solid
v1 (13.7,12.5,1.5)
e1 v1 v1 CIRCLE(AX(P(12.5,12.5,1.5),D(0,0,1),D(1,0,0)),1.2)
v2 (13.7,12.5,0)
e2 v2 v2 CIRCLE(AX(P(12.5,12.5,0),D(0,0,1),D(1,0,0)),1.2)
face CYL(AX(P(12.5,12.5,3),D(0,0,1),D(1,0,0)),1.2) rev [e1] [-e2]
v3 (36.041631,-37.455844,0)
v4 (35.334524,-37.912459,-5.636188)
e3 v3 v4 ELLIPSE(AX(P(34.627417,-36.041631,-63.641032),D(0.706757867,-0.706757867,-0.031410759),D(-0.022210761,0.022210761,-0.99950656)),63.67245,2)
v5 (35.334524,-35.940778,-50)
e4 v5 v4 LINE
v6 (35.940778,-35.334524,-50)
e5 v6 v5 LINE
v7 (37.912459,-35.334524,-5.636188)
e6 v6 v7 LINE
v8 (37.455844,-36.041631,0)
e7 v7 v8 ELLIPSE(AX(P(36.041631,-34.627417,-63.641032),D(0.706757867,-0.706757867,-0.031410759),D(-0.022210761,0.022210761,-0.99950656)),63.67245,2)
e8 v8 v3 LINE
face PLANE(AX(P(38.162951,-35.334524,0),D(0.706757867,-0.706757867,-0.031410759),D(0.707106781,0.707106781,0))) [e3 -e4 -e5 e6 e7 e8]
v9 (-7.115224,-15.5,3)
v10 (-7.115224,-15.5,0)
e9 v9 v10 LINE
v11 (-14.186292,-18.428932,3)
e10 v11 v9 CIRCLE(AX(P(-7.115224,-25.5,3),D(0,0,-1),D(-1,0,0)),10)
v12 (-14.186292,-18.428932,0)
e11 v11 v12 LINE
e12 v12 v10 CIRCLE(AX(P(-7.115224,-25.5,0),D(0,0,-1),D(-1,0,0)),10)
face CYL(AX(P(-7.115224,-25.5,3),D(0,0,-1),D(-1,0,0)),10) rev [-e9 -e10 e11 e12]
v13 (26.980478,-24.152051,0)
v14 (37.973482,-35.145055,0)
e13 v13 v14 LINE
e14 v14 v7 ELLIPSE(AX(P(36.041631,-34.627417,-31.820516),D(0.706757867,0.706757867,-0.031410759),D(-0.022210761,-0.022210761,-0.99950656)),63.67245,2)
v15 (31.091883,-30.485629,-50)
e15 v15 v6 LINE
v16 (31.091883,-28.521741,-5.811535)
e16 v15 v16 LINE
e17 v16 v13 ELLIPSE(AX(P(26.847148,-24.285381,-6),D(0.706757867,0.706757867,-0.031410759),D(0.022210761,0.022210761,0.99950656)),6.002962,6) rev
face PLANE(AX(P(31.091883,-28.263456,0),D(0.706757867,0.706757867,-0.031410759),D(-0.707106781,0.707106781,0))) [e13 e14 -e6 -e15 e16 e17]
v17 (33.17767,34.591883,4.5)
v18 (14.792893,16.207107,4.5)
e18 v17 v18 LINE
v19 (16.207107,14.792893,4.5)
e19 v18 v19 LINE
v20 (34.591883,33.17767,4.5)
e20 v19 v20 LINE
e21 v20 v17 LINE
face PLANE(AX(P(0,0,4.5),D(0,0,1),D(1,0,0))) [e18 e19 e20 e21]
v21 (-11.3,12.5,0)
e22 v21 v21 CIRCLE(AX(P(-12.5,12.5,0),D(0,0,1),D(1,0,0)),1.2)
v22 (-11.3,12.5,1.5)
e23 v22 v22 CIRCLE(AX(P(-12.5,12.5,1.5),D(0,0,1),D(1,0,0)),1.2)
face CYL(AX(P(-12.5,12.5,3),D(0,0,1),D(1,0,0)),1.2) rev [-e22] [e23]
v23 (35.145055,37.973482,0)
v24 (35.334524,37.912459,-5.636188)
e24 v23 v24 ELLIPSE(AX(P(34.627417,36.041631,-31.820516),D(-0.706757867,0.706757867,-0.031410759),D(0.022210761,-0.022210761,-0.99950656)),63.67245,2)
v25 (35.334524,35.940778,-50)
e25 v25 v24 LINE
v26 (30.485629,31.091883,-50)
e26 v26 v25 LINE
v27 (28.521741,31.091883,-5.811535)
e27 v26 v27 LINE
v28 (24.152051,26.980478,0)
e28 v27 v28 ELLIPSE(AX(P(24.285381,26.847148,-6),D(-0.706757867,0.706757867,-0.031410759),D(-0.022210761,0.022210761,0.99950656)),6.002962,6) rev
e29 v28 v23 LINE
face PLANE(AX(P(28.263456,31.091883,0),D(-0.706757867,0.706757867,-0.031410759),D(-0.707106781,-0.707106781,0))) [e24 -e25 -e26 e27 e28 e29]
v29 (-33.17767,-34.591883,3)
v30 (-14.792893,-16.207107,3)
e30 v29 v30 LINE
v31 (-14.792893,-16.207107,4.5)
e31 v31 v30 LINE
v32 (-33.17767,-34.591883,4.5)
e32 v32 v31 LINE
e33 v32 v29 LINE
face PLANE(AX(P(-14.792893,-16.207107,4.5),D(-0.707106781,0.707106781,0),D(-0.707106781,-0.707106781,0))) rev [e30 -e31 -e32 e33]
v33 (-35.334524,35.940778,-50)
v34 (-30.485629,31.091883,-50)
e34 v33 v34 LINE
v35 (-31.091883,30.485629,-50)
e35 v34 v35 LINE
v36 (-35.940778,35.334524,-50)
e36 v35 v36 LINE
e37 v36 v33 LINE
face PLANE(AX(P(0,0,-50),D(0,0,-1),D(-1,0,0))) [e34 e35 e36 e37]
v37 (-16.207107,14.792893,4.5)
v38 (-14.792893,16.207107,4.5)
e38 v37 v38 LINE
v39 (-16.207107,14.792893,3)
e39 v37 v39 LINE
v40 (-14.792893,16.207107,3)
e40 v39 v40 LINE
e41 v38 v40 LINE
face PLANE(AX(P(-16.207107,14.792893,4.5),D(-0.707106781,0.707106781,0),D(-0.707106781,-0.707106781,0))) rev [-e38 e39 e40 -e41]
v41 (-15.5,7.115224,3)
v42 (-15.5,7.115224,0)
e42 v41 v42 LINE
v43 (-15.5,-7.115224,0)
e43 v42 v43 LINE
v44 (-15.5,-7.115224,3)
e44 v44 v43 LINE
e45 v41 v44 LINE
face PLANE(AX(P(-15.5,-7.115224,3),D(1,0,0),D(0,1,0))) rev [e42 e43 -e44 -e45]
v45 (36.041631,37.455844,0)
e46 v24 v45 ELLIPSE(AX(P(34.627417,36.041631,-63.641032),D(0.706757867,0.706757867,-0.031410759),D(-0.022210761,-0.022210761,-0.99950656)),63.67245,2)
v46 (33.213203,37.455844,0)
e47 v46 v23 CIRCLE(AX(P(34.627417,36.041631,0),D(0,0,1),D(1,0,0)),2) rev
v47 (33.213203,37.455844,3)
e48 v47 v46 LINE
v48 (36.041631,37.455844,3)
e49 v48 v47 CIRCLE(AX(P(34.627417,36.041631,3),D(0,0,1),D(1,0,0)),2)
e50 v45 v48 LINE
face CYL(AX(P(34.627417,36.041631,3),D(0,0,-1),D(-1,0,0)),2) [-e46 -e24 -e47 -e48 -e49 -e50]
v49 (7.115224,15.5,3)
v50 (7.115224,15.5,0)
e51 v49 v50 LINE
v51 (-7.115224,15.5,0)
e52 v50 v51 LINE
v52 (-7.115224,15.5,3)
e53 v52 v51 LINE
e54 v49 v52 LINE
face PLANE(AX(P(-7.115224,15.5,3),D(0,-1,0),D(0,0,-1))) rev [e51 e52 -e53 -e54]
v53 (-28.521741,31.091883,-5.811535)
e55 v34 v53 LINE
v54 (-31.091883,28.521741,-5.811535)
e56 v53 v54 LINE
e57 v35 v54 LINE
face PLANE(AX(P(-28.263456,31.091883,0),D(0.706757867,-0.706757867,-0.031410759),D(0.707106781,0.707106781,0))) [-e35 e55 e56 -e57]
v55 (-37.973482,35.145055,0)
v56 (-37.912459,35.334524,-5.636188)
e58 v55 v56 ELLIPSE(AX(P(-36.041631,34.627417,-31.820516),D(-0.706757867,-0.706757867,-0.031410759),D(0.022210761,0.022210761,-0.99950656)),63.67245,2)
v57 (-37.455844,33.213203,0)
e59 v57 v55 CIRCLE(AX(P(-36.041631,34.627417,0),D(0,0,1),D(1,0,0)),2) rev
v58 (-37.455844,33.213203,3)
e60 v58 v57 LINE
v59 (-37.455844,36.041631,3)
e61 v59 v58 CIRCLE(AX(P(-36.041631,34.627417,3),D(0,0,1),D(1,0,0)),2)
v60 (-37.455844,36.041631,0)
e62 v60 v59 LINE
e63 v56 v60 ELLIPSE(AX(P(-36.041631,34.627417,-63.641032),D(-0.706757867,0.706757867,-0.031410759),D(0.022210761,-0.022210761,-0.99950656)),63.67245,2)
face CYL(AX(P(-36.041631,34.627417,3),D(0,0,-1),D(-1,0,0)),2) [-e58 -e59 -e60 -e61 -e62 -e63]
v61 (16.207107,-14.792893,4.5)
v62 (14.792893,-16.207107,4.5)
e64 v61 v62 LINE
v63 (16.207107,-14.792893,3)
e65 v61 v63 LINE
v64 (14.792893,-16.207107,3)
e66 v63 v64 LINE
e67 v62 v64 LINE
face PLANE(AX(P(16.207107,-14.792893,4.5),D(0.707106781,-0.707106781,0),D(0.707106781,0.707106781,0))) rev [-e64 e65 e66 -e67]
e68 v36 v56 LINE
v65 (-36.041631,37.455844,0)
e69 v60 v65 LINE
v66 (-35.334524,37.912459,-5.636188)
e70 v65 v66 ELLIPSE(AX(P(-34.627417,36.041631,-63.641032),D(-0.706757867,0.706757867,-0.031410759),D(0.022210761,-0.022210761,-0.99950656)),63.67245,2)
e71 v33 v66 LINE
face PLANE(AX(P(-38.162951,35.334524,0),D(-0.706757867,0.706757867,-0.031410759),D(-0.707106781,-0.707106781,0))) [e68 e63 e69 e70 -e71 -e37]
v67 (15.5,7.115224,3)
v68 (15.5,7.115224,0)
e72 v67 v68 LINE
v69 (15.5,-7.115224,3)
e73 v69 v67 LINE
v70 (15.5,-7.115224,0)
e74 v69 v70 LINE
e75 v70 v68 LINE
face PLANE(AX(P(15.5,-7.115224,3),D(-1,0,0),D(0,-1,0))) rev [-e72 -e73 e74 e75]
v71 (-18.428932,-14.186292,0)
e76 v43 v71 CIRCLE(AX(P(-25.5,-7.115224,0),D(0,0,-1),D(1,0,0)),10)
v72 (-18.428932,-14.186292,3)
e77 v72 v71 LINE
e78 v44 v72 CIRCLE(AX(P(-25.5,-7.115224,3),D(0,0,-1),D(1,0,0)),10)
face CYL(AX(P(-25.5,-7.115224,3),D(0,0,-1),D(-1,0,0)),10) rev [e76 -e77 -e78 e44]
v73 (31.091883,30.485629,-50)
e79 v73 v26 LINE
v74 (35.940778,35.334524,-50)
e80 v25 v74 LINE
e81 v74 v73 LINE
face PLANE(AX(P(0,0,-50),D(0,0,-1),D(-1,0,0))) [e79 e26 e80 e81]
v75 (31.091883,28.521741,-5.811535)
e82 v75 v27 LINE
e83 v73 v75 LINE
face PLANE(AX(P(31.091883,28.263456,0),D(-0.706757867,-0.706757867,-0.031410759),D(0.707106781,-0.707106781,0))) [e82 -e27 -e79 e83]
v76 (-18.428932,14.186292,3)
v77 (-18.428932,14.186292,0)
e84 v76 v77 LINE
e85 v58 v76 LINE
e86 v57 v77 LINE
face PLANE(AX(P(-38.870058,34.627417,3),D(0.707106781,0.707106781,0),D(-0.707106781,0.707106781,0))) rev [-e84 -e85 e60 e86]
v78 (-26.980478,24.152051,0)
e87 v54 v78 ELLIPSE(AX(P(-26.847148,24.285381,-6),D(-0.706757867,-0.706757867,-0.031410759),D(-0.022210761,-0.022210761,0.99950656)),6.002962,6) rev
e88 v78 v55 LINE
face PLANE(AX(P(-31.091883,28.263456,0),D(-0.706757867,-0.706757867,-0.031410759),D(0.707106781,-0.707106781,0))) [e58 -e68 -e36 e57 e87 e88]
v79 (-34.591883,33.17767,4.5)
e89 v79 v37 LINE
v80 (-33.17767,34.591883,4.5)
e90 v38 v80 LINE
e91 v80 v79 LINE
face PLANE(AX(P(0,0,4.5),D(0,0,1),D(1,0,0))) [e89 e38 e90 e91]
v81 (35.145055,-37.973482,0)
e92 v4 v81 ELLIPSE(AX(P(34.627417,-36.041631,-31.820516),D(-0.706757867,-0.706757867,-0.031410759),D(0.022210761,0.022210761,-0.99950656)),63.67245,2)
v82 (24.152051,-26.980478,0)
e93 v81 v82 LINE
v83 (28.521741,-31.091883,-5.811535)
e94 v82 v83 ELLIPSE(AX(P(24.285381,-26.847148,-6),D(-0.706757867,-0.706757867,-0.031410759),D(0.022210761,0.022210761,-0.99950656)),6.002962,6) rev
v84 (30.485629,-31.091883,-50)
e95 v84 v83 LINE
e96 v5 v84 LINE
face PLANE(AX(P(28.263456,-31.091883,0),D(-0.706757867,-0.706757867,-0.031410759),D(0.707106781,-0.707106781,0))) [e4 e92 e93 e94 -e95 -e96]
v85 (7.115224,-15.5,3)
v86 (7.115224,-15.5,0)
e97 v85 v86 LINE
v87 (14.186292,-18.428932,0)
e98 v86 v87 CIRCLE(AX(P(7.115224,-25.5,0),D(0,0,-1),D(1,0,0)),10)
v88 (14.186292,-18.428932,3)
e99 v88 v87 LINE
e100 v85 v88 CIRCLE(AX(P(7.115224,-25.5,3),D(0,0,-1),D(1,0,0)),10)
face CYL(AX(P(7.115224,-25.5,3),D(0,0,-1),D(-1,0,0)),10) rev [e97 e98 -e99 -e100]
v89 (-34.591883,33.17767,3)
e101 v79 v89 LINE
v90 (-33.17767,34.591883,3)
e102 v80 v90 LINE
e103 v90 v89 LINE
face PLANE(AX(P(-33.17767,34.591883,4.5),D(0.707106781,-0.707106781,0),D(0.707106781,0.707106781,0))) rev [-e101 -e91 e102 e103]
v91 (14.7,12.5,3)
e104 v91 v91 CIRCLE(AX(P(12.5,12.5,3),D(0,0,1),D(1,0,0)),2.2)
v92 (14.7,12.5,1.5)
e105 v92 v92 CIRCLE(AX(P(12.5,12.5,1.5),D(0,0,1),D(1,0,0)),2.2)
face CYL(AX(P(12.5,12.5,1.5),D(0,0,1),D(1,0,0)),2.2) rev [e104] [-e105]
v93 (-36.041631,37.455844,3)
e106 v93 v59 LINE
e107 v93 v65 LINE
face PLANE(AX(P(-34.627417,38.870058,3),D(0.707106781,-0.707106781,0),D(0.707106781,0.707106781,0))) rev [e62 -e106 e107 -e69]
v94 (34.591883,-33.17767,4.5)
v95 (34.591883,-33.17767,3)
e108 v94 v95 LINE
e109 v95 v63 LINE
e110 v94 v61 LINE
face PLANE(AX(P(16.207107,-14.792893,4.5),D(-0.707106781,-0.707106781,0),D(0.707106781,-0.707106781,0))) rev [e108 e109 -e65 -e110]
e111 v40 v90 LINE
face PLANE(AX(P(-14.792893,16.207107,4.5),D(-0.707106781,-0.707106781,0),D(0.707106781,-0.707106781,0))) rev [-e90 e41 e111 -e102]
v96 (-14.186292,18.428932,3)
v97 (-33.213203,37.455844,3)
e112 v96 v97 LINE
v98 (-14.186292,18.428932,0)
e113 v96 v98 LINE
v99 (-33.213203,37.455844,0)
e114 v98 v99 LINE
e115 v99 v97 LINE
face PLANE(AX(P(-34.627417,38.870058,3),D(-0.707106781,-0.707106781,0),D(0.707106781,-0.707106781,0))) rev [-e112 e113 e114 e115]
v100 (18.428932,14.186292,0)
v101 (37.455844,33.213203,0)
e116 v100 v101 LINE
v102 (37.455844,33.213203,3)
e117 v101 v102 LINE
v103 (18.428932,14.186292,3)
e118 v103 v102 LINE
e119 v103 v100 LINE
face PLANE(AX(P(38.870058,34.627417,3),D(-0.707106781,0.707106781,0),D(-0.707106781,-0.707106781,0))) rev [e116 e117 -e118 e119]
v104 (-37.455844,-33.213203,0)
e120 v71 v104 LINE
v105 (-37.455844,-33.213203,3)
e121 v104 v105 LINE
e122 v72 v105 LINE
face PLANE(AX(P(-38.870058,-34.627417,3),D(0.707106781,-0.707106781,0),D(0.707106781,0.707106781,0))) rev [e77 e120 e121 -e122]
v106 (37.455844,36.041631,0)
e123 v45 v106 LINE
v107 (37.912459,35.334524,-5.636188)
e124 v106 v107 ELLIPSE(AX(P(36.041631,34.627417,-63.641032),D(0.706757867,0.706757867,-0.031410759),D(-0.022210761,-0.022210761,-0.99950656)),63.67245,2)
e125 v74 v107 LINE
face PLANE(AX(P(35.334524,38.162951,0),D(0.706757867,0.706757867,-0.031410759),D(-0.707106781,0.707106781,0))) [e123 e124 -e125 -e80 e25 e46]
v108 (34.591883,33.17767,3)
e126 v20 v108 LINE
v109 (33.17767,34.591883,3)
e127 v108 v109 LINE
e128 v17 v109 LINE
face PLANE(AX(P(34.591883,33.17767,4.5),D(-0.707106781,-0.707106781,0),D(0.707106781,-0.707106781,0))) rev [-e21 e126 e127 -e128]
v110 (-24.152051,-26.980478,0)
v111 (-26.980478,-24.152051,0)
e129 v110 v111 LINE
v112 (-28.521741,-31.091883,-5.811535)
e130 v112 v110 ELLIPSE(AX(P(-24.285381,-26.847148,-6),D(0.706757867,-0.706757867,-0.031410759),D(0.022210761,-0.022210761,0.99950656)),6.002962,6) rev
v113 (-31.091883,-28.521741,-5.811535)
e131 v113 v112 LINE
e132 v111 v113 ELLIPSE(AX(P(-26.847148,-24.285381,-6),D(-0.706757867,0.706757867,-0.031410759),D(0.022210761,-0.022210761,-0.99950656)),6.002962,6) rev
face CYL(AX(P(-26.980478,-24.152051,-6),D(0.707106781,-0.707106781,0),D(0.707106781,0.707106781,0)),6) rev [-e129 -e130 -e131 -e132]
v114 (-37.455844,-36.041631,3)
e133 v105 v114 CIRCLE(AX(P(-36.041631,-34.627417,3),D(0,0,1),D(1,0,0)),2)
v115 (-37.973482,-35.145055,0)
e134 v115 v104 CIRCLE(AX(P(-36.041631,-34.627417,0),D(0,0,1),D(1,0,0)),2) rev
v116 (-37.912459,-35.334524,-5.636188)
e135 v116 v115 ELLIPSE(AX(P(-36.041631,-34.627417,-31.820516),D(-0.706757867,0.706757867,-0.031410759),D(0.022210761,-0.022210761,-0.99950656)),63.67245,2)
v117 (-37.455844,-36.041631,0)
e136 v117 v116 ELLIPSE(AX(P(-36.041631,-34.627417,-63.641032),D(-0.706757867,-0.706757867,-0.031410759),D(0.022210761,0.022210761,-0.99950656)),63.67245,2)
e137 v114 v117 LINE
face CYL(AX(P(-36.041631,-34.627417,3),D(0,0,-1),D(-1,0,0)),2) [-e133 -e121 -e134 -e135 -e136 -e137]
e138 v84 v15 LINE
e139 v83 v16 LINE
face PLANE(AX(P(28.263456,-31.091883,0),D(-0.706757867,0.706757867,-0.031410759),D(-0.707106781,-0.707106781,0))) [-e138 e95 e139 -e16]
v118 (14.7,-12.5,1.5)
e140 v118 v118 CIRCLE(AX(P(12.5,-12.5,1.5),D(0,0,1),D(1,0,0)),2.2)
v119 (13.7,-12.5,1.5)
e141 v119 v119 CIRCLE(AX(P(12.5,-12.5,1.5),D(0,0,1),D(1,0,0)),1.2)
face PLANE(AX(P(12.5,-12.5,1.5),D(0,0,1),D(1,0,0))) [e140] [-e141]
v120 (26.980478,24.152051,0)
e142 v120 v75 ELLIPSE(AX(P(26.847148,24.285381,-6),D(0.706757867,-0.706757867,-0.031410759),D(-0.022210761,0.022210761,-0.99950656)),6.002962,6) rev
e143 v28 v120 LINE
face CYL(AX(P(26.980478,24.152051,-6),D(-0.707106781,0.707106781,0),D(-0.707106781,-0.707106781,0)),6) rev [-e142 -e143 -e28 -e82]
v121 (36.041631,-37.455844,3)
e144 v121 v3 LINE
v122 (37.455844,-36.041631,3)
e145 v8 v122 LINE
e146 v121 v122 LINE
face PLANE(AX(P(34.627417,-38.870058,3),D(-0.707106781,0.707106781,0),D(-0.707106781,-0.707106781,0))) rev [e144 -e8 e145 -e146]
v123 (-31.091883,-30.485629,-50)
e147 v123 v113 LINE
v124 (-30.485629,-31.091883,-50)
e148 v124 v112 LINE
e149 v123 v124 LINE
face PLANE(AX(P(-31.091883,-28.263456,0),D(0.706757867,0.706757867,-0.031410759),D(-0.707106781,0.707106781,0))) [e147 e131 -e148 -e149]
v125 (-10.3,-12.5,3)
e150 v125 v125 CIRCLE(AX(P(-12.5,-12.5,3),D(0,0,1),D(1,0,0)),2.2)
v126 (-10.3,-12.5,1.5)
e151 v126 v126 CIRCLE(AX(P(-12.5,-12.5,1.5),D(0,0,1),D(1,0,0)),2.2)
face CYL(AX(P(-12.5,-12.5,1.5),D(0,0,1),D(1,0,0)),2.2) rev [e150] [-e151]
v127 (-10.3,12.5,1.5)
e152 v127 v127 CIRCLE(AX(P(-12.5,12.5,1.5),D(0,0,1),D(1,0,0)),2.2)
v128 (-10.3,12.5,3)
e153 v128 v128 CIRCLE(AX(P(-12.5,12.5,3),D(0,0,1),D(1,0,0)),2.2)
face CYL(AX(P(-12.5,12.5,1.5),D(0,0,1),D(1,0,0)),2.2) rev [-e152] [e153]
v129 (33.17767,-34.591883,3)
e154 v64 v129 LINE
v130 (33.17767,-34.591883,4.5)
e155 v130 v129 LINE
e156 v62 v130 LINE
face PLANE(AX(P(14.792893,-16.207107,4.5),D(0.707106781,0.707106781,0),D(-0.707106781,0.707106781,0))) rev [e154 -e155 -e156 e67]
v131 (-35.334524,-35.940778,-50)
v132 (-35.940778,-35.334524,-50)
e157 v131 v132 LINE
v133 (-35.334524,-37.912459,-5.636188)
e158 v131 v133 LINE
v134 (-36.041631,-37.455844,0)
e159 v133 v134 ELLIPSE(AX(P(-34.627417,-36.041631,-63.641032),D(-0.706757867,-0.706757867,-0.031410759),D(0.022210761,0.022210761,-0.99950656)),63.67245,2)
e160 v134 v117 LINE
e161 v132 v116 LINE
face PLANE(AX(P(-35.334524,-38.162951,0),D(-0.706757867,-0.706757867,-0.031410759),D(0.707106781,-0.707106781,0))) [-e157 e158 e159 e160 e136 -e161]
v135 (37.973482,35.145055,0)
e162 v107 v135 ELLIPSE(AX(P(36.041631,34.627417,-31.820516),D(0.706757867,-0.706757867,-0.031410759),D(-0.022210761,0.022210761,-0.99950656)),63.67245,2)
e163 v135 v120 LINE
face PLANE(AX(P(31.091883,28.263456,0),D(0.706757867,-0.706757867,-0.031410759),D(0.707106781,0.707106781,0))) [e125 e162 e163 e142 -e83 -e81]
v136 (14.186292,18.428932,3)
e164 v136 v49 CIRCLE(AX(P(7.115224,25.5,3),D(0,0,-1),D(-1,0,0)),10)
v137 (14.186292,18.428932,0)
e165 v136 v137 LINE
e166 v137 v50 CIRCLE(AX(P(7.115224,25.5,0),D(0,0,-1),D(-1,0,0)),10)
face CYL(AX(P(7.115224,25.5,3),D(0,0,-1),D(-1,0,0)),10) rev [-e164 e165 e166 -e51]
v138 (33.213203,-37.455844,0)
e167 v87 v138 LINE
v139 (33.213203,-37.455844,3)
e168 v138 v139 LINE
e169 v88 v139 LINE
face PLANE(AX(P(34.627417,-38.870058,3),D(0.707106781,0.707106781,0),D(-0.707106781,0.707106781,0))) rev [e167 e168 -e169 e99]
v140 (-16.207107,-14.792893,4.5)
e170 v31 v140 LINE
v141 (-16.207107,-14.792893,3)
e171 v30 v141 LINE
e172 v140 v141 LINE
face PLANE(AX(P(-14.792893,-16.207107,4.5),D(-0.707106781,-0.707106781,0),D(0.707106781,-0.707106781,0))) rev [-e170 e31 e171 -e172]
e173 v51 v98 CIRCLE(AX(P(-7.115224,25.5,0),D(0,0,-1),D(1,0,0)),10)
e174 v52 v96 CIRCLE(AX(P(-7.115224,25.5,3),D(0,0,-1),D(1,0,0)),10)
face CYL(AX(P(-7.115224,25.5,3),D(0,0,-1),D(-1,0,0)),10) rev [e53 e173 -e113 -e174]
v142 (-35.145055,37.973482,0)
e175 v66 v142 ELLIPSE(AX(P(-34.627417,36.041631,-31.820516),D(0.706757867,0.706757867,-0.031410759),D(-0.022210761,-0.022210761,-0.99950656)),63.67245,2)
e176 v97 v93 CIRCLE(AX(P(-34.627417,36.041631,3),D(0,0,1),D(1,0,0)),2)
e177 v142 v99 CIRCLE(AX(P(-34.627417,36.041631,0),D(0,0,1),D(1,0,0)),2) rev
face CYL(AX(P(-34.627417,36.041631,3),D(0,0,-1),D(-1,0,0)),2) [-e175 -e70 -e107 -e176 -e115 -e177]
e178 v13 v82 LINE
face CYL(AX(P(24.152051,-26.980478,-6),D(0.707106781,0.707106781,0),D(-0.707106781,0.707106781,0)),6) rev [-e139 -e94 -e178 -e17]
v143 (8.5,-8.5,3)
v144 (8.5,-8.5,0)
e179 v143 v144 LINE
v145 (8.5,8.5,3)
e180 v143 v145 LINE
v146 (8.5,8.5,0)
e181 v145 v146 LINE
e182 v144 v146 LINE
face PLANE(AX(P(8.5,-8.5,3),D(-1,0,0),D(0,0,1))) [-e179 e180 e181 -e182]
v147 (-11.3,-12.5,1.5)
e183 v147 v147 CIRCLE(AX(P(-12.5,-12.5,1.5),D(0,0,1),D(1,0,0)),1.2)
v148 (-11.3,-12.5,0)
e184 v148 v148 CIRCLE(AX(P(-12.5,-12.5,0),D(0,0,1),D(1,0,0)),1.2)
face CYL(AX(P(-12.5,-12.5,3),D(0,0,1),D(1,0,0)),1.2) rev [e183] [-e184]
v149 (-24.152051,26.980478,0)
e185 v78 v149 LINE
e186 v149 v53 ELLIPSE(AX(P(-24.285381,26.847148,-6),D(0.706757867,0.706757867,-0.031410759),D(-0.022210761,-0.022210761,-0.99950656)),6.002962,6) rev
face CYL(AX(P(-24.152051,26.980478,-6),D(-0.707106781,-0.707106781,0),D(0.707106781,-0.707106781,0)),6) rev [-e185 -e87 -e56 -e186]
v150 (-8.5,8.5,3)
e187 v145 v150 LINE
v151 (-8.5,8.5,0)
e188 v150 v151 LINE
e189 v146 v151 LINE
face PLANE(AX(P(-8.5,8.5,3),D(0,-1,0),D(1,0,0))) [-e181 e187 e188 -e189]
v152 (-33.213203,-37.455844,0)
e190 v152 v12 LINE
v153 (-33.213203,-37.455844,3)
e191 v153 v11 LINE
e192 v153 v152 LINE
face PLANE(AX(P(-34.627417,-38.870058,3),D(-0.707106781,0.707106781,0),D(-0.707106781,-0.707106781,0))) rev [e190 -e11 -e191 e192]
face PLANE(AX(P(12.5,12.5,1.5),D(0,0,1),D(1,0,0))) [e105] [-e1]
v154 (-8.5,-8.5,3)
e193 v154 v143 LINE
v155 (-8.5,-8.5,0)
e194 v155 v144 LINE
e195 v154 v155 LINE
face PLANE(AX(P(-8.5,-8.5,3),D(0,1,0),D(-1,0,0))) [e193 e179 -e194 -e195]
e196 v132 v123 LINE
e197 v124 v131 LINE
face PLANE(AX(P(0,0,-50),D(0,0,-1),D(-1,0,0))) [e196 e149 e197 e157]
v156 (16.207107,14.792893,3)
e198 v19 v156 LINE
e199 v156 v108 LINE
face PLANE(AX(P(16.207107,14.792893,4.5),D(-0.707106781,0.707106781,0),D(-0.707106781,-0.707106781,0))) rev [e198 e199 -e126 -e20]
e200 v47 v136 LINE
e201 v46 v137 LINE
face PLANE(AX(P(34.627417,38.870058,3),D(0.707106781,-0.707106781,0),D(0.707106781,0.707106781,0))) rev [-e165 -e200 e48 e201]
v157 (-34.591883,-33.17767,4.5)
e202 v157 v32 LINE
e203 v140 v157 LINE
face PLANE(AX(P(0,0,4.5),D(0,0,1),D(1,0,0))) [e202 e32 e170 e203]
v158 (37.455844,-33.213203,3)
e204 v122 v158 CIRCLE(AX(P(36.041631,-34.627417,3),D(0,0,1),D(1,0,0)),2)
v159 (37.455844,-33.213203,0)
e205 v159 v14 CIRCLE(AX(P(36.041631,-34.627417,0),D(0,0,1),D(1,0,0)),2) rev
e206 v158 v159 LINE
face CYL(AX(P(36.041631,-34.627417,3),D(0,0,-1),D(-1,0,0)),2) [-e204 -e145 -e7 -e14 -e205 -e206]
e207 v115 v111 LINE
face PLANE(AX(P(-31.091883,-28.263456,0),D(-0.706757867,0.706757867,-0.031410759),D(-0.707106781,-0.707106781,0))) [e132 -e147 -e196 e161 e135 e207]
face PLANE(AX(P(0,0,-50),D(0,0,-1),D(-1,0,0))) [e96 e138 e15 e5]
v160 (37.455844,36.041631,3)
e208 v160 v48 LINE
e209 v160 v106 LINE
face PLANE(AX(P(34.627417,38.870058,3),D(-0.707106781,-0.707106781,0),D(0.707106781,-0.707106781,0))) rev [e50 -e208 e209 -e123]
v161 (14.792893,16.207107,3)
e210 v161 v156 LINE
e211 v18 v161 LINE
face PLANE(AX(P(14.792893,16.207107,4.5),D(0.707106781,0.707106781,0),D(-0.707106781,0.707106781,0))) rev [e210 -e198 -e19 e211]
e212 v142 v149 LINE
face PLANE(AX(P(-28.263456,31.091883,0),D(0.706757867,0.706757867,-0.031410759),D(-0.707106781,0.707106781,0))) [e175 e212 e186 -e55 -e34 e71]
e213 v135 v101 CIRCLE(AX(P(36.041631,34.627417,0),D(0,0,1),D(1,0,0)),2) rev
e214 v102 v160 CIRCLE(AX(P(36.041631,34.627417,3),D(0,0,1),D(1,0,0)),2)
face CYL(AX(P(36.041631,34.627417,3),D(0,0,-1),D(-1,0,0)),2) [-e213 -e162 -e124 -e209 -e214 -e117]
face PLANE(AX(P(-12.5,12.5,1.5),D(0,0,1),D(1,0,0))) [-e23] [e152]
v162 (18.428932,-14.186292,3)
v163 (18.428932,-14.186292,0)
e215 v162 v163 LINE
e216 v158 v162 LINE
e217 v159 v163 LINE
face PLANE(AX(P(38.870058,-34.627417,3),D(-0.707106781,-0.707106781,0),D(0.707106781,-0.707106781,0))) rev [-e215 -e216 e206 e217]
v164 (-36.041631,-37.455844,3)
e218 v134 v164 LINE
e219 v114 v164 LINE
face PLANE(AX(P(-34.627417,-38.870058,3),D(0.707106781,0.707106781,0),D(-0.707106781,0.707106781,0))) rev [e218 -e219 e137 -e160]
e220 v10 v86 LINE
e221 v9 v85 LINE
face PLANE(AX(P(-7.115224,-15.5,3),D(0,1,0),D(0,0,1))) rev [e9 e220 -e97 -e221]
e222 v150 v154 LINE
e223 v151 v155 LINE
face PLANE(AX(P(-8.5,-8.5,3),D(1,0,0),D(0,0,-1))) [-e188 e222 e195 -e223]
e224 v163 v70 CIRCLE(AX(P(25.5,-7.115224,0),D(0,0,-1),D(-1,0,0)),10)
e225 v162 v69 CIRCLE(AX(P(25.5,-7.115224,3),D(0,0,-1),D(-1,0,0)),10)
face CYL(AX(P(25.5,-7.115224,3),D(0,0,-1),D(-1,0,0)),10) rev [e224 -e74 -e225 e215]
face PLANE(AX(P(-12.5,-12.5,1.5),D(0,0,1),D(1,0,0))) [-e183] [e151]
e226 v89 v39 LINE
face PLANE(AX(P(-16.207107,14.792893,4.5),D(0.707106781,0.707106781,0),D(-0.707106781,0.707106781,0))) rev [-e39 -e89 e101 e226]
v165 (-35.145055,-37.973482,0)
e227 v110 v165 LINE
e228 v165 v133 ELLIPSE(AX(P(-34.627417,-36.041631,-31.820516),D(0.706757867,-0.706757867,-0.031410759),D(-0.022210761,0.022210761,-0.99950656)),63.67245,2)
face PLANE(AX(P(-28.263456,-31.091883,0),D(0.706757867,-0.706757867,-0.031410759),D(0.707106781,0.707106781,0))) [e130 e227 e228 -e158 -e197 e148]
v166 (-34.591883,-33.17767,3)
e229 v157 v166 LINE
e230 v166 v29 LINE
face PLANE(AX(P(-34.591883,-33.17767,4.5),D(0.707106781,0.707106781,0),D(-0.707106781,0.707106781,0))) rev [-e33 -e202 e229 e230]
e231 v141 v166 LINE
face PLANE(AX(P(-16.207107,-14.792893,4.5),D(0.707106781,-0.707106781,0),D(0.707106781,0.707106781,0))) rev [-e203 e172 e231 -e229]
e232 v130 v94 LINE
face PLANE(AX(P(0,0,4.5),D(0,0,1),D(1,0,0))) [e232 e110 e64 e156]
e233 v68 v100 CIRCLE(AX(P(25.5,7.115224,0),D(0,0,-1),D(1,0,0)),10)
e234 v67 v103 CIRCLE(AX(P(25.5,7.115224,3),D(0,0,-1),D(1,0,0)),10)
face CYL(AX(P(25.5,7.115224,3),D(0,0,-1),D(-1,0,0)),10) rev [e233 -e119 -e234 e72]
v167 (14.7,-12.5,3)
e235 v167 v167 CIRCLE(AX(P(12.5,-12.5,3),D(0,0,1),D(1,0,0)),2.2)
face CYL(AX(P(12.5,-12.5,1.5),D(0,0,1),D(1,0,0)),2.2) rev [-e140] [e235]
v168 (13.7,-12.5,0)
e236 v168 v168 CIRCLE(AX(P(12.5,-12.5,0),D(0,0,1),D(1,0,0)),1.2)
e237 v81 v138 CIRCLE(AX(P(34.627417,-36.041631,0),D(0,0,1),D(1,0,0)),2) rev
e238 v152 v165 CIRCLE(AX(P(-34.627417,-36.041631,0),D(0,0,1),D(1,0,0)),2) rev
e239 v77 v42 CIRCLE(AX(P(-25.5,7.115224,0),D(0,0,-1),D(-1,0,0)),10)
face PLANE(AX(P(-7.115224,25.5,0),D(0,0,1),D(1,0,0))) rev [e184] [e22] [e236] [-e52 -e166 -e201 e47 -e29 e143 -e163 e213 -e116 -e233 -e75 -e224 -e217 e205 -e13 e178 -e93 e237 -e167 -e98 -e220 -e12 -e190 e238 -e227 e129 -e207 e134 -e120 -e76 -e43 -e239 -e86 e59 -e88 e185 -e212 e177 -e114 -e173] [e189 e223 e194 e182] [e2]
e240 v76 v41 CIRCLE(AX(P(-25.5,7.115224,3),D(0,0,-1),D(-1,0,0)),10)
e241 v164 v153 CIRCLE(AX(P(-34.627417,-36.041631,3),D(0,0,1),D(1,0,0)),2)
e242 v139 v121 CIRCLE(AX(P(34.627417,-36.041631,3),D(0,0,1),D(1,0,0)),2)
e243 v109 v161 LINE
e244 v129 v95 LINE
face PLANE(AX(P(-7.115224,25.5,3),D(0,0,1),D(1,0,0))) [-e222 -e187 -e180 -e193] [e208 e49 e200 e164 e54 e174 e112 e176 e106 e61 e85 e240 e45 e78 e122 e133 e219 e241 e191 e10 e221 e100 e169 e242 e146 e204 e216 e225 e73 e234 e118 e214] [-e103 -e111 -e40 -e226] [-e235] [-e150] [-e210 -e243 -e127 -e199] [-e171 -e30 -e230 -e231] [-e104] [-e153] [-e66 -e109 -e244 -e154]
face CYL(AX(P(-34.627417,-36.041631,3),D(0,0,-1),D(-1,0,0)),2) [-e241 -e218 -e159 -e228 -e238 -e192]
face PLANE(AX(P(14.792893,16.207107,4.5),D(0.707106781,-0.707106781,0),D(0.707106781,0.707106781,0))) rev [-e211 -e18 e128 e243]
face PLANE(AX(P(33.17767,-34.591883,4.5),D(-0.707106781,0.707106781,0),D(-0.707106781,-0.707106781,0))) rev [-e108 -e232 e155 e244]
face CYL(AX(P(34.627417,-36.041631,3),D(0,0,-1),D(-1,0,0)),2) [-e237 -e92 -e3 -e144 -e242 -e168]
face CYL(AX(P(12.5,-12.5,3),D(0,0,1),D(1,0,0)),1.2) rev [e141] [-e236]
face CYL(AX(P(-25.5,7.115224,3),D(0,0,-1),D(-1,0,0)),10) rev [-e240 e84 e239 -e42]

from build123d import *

# Parameters (mm, degrees)
SKETCH2_W                      = 17
SKETCH2_H                      = 17
BOSS_EXTRUDE1_DEPTH            = 3
SKETCH3_R                      = 2.2
CUT_EXTRUDE1_DEPTH             = 1.5
M2_CLEARANCE_HOLE1_D           = 2.4
M2_CLEARANCE_HOLE1_CSINK_D     = 2.45
M2_CLEARANCE_HOLE1_CSINK_ANGLE = 90
BOSS_EXTRUDE2_DEPTH            = 50
BOSS_EXTRUDE2_DRAFT            = 1.8
BOSS_EXTRUDE2_PROFILE_2_DEPTH  = 50
BOSS_EXTRUDE2_PROFILE_2_DRAFT  = 1.8
BOSS_EXTRUDE2_PROFILE_3_DEPTH  = 50
BOSS_EXTRUDE2_PROFILE_3_DRAFT  = 1.8
BOSS_EXTRUDE2_PROFILE_4_DEPTH  = 50
BOSS_EXTRUDE2_PROFILE_4_DRAFT  = 1.8
FILLET1_R                      = 6
FILLET2_R                      = 2
BOSS_EXTRUDE3_DEPTH            = 1.5


with BuildPart() as part:
    # Sketch2 → Boss-Extrude1 (new body)
    with BuildSketch(Plane(origin=(0, 0, 0), x_dir=(0, 1, 0), z_dir=(0, 0, 1))):
        with BuildLine():
            Line((-38.870057685, 34.627416998), (-34.627416998, 38.870057685))
            Line((-34.627416998, 38.870057685), (-14.186291501, 18.428932188))
            ThreePointArc((-14.186291501, 18.428932188), (-10.942058013, 16.261204675), (-7.115223689, 15.5))
            Line((-7.115223689, 15.5), (7.115223689, 15.5))
            ThreePointArc((7.115223689, 15.5), (10.942058013, 16.261204675), (14.186291501, 18.428932188))
            Line((14.186291501, 18.428932188), (34.627416998, 38.870057685))
            Line((34.627416998, 38.870057685), (38.870057685, 34.627416998))
            Line((38.870057685, 34.627416998), (18.428932188, 14.186291501))
            ThreePointArc((18.428932188, 14.186291501), (16.261204675, 10.942058013), (15.5, 7.115223689))
            Line((15.5, 7.115223689), (15.5, -7.115223689))
            ThreePointArc((15.5, -7.115223689), (16.261204675, -10.942058013), (18.428932188, -14.186291501))
            Line((18.428932188, -14.186291501), (38.870057685, -34.627416998))
            Line((38.870057685, -34.627416998), (34.627416998, -38.870057685))
            Line((34.627416998, -38.870057685), (14.186291501, -18.428932188))
            ThreePointArc((14.186291501, -18.428932188), (10.942058013, -16.261204675), (7.115223689, -15.5))
            Line((7.115223689, -15.5), (-7.115223689, -15.5))
            ThreePointArc((-7.115223689, -15.5), (-10.942058013, -16.261204675), (-14.186291501, -18.428932188))
            Line((-14.186291501, -18.428932188), (-34.627416998, -38.870057685))
            Line((-34.627416998, -38.870057685), (-38.870057685, -34.627416998))
            Line((-38.870057685, -34.627416998), (-18.428932188, -14.186291501))
            ThreePointArc((-18.428932188, -14.186291501), (-16.261204675, -10.942058013), (-15.5, -7.115223689))
            Line((-15.5, -7.115223689), (-15.5, 7.115223689))
            ThreePointArc((-15.5, 7.115223689), (-16.261204675, 10.942058013), (-18.428932188, 14.186291501))
            Line((-18.428932188, 14.186291501), (-38.870057685, 34.627416998))
        make_face()
        Rectangle(SKETCH2_W, SKETCH2_H, mode=Mode.SUBTRACT)
    extrude(amount=BOSS_EXTRUDE1_DEPTH)

    # Sketch3 → Cut-Extrude1 (cut)
    with BuildSketch(Plane.XY.offset(3)):
        with Locations((-12.5, 12.5)):
            Circle(SKETCH3_R)
        with Locations((12.5, 12.5)):
            Circle(SKETCH3_R)
        with Locations((12.5, -12.5)):
            Circle(SKETCH3_R)
        with Locations((-12.5, -12.5)):
            Circle(SKETCH3_R)
    extrude(amount=-CUT_EXTRUDE1_DEPTH, mode=Mode.SUBTRACT)

    # M2 Clearance Hole1 (through all)
    with Locations(Plane.XY.offset(3)):
        with Locations((12.5, 12.5), (-12.5, -12.5), (-12.5, 12.5), (12.5, -12.5)):
            CounterSinkHole(M2_CLEARANCE_HOLE1_D / 2, M2_CLEARANCE_HOLE1_CSINK_D / 2, counter_sink_angle=M2_CLEARANCE_HOLE1_CSINK_ANGLE)


with BuildPart() as boss_extrude2_tool:
    # Sketch7 → Boss-Extrude2 (with draft: the straight prism first)
    with BuildSketch(Plane(origin=(0, 0, 0), x_dir=(1, 0, 0), z_dir=(0, 0, -1))):
        Polygon((28.263455967, 31.091883092), (31.091883092, 28.263455967), (38.162950904, 35.334523779), (35.334523779, 38.162950904), align=None)
    extrude(amount=BOSS_EXTRUDE2_DEPTH)
    # Boss-Extrude2: the draft: its side faces are tilted about the plane it starts from
    boss_extrude2_sides = [boss_extrude2_tool.faces().sort_by_distance(p)[0] for p in [
        (29.67766953, -29.67766953, -25),
        (34.627416998, -31.798989873, -25),
        (36.748737342, -36.748737342, -25),
        (31.798989873, -34.627416998, -25),
    ]]
    draft(boss_extrude2_sides, Plane(origin=(0, 0, 0), x_dir=(1, 0, 0), z_dir=(0, 0, -1)), BOSS_EXTRUDE2_DRAFT)


with BuildPart() as part_1:
    add(part.part)

    # Boss-Extrude2: add boss_extrude2_tool
    add(boss_extrude2_tool.part)


with BuildPart() as boss_extrude2_profile_2_tool:
    # Sketch7 → Boss-Extrude2 profile 2 (with draft: the straight prism first)
    with BuildSketch(Plane(origin=(0, 0, 0), x_dir=(1, 0, 0), z_dir=(0, 0, -1))):
        Polygon((31.091883092, -28.263455967), (28.263455967, -31.091883092), (35.334523779, -38.162950904), (38.162950904, -35.334523779), align=None)
    extrude(amount=BOSS_EXTRUDE2_PROFILE_2_DEPTH)
    # Boss-Extrude2 profile 2: the draft: its side faces are tilted about the plane it starts from
    boss_extrude2_profile_2_sides = [boss_extrude2_profile_2_tool.faces().sort_by_distance(p)[0] for p in [
        (29.67766953, 29.67766953, -25),
        (31.798989873, 34.627416998, -25),
        (36.748737342, 36.748737342, -25),
        (34.627416998, 31.798989873, -25),
    ]]
    draft(boss_extrude2_profile_2_sides, Plane(origin=(0, 0, 0), x_dir=(1, 0, 0), z_dir=(0, 0, -1)), BOSS_EXTRUDE2_PROFILE_2_DRAFT)


with BuildPart() as part_2:
    add(part_1.part)

    # Boss-Extrude2 profile 2: add boss_extrude2_profile_2_tool
    add(boss_extrude2_profile_2_tool.part)


with BuildPart() as boss_extrude2_profile_3_tool:
    # Sketch7 → Boss-Extrude2 profile 3 (with draft: the straight prism first)
    with BuildSketch(Plane(origin=(0, 0, 0), x_dir=(1, 0, 0), z_dir=(0, 0, -1))):
        Polygon((-28.263455967, -31.091883092), (-31.091883092, -28.263455967), (-38.162950904, -35.334523779), (-35.334523779, -38.162950904), align=None)
    extrude(amount=BOSS_EXTRUDE2_PROFILE_3_DEPTH)
    # Boss-Extrude2 profile 3: the draft: its side faces are tilted about the plane it starts from
    boss_extrude2_profile_3_sides = [boss_extrude2_profile_3_tool.faces().sort_by_distance(p)[0] for p in [
        (-29.67766953, 29.67766953, -25),
        (-34.627416998, 31.798989873, -25),
        (-36.748737342, 36.748737342, -25),
        (-31.798989873, 34.627416998, -25),
    ]]
    draft(boss_extrude2_profile_3_sides, Plane(origin=(0, 0, 0), x_dir=(1, 0, 0), z_dir=(0, 0, -1)), BOSS_EXTRUDE2_PROFILE_3_DRAFT)


with BuildPart() as part_3:
    add(part_2.part)

    # Boss-Extrude2 profile 3: add boss_extrude2_profile_3_tool
    add(boss_extrude2_profile_3_tool.part)


with BuildPart() as boss_extrude2_profile_4_tool:
    # Sketch7 → Boss-Extrude2 profile 4 (with draft: the straight prism first)
    with BuildSketch(Plane(origin=(0, 0, 0), x_dir=(1, 0, 0), z_dir=(0, 0, -1))):
        Polygon((-31.091883092, 28.263455967), (-28.263455967, 31.091883092), (-35.334523779, 38.162950904), (-38.162950904, 35.334523779), align=None)
    extrude(amount=BOSS_EXTRUDE2_PROFILE_4_DEPTH)
    # Boss-Extrude2 profile 4: the draft: its side faces are tilted about the plane it starts from
    boss_extrude2_profile_4_sides = [boss_extrude2_profile_4_tool.faces().sort_by_distance(p)[0] for p in [
        (-29.67766953, -29.67766953, -25),
        (-31.798989873, -34.627416998, -25),
        (-36.748737342, -36.748737342, -25),
        (-34.627416998, -31.798989873, -25),
    ]]
    draft(boss_extrude2_profile_4_sides, Plane(origin=(0, 0, 0), x_dir=(1, 0, 0), z_dir=(0, 0, -1)), BOSS_EXTRUDE2_PROFILE_4_DRAFT)


with BuildPart() as part_4:
    add(part_3.part)

    # Boss-Extrude2 profile 4: add boss_extrude2_profile_4_tool
    add(boss_extrude2_profile_4_tool.part)

    # Fillet1
    fillet1_edges = [part_4.edges().sort_by_distance(p)[0] for p in [
        (-29.67766953, -29.67766953, 0),
        (-29.67766953, 29.67766953, 0),
        (29.67766953, 29.67766953, 0),
        (29.67766953, -29.67766953, 0),
    ]]
    fillet(fillet1_edges, radius=FILLET1_R)

    # Fillet2
    # the kernel refuses this fillet: 2 mm, written as the material it takes off along each edge
    with BuildSketch(Plane(origin=(34.627416998, 38.870057685, -12), x_dir=(0.7071067811865476, -0.7071067811865476, 0), z_dir=(0, 0, 1)), Plane(origin=(38.870057685, 34.627416998, -12), x_dir=(-0.7071067811865476, -0.7071067811865476, 0), z_dir=(0, 0, 1)), Plane(origin=(38.870057685, -34.627416998, -12), x_dir=(-0.7071067811865476, -0.7071067811865476, 0), z_dir=(0, 0, 1)), Plane(origin=(34.627416998, -38.870057685, -12), x_dir=(-0.7071067811865476, 0.7071067811865476, 0), z_dir=(0, 0, 1)), Plane(origin=(-38.870057685, -34.627416998, -12), x_dir=(0.7071067811865476, 0.7071067811865476, 0), z_dir=(0, 0, 1)), Plane(origin=(-38.870057685, 34.627416998, -12), x_dir=(0.7071067811865476, 0.7071067811865476, 0), z_dir=(0, 0, 1)), Plane(origin=(-34.627416998, 38.870057685, -12), x_dir=(0.7071067811865476, -0.7071067811865476, 0), z_dir=(0, 0, 1))) as fillet2_piece_1:
        with BuildLine():
            CenterArc((FILLET2_R, -FILLET2_R), FILLET2_R, 90, 90)
            Line((0, -FILLET2_R), (-FILLET2_R * 0.02, -FILLET2_R))
            Line((-FILLET2_R * 0.02, -FILLET2_R), (-FILLET2_R * 0.02, FILLET2_R * 0.02))
            Line((-FILLET2_R * 0.02, FILLET2_R * 0.02), (FILLET2_R, FILLET2_R * 0.02))
            Line((FILLET2_R, FILLET2_R * 0.02), (FILLET2_R, 0))
        make_face()
    extrude(amount=27, mode=Mode.SUBTRACT)
    with BuildSketch(Plane(origin=(-34.627416998, -38.870057685, -12), x_dir=(0.7071067811865458, 0.7071067811865493, 0), z_dir=(0, 0, 1))) as fillet2_piece_2:
        with BuildLine():
            CenterArc((FILLET2_R, FILLET2_R), FILLET2_R, 180, 90)
            Line((0, FILLET2_R), (-FILLET2_R * 0.02, FILLET2_R))
            Line((-FILLET2_R * 0.02, FILLET2_R), (-FILLET2_R * 0.02, -FILLET2_R * 0.02))
            Line((-FILLET2_R * 0.02, -FILLET2_R * 0.02), (FILLET2_R, -FILLET2_R * 0.02))
            Line((FILLET2_R, -FILLET2_R * 0.02), (FILLET2_R, 0))
        make_face()
    extrude(amount=27, mode=Mode.SUBTRACT)

    # Sketch8 → Boss-Extrude3 (add)
    with BuildSketch(Plane.XY.offset(3)):
        Polygon((-16.207106781, 14.792893219), (-14.792893219, 16.207106781), (-33.17766953, 34.591883092), (-34.591883092, 33.17766953), align=None)
        Polygon((14.792893219, 16.207106781), (16.207106781, 14.792893219), (34.591883092, 33.17766953), (33.17766953, 34.591883092), align=None)
        Polygon((16.207106781, -14.792893219), (14.792893219, -16.207106781), (33.17766953, -34.591883092), (34.591883092, -33.17766953), align=None)
        Polygon((-14.792893219, -16.207106781), (-16.207106781, -14.792893219), (-34.591883092, -33.17766953), (-33.17766953, -34.591883092), align=None)
    extrude(amount=BOSS_EXTRUDE3_DEPTH)


solid = part_4.part
